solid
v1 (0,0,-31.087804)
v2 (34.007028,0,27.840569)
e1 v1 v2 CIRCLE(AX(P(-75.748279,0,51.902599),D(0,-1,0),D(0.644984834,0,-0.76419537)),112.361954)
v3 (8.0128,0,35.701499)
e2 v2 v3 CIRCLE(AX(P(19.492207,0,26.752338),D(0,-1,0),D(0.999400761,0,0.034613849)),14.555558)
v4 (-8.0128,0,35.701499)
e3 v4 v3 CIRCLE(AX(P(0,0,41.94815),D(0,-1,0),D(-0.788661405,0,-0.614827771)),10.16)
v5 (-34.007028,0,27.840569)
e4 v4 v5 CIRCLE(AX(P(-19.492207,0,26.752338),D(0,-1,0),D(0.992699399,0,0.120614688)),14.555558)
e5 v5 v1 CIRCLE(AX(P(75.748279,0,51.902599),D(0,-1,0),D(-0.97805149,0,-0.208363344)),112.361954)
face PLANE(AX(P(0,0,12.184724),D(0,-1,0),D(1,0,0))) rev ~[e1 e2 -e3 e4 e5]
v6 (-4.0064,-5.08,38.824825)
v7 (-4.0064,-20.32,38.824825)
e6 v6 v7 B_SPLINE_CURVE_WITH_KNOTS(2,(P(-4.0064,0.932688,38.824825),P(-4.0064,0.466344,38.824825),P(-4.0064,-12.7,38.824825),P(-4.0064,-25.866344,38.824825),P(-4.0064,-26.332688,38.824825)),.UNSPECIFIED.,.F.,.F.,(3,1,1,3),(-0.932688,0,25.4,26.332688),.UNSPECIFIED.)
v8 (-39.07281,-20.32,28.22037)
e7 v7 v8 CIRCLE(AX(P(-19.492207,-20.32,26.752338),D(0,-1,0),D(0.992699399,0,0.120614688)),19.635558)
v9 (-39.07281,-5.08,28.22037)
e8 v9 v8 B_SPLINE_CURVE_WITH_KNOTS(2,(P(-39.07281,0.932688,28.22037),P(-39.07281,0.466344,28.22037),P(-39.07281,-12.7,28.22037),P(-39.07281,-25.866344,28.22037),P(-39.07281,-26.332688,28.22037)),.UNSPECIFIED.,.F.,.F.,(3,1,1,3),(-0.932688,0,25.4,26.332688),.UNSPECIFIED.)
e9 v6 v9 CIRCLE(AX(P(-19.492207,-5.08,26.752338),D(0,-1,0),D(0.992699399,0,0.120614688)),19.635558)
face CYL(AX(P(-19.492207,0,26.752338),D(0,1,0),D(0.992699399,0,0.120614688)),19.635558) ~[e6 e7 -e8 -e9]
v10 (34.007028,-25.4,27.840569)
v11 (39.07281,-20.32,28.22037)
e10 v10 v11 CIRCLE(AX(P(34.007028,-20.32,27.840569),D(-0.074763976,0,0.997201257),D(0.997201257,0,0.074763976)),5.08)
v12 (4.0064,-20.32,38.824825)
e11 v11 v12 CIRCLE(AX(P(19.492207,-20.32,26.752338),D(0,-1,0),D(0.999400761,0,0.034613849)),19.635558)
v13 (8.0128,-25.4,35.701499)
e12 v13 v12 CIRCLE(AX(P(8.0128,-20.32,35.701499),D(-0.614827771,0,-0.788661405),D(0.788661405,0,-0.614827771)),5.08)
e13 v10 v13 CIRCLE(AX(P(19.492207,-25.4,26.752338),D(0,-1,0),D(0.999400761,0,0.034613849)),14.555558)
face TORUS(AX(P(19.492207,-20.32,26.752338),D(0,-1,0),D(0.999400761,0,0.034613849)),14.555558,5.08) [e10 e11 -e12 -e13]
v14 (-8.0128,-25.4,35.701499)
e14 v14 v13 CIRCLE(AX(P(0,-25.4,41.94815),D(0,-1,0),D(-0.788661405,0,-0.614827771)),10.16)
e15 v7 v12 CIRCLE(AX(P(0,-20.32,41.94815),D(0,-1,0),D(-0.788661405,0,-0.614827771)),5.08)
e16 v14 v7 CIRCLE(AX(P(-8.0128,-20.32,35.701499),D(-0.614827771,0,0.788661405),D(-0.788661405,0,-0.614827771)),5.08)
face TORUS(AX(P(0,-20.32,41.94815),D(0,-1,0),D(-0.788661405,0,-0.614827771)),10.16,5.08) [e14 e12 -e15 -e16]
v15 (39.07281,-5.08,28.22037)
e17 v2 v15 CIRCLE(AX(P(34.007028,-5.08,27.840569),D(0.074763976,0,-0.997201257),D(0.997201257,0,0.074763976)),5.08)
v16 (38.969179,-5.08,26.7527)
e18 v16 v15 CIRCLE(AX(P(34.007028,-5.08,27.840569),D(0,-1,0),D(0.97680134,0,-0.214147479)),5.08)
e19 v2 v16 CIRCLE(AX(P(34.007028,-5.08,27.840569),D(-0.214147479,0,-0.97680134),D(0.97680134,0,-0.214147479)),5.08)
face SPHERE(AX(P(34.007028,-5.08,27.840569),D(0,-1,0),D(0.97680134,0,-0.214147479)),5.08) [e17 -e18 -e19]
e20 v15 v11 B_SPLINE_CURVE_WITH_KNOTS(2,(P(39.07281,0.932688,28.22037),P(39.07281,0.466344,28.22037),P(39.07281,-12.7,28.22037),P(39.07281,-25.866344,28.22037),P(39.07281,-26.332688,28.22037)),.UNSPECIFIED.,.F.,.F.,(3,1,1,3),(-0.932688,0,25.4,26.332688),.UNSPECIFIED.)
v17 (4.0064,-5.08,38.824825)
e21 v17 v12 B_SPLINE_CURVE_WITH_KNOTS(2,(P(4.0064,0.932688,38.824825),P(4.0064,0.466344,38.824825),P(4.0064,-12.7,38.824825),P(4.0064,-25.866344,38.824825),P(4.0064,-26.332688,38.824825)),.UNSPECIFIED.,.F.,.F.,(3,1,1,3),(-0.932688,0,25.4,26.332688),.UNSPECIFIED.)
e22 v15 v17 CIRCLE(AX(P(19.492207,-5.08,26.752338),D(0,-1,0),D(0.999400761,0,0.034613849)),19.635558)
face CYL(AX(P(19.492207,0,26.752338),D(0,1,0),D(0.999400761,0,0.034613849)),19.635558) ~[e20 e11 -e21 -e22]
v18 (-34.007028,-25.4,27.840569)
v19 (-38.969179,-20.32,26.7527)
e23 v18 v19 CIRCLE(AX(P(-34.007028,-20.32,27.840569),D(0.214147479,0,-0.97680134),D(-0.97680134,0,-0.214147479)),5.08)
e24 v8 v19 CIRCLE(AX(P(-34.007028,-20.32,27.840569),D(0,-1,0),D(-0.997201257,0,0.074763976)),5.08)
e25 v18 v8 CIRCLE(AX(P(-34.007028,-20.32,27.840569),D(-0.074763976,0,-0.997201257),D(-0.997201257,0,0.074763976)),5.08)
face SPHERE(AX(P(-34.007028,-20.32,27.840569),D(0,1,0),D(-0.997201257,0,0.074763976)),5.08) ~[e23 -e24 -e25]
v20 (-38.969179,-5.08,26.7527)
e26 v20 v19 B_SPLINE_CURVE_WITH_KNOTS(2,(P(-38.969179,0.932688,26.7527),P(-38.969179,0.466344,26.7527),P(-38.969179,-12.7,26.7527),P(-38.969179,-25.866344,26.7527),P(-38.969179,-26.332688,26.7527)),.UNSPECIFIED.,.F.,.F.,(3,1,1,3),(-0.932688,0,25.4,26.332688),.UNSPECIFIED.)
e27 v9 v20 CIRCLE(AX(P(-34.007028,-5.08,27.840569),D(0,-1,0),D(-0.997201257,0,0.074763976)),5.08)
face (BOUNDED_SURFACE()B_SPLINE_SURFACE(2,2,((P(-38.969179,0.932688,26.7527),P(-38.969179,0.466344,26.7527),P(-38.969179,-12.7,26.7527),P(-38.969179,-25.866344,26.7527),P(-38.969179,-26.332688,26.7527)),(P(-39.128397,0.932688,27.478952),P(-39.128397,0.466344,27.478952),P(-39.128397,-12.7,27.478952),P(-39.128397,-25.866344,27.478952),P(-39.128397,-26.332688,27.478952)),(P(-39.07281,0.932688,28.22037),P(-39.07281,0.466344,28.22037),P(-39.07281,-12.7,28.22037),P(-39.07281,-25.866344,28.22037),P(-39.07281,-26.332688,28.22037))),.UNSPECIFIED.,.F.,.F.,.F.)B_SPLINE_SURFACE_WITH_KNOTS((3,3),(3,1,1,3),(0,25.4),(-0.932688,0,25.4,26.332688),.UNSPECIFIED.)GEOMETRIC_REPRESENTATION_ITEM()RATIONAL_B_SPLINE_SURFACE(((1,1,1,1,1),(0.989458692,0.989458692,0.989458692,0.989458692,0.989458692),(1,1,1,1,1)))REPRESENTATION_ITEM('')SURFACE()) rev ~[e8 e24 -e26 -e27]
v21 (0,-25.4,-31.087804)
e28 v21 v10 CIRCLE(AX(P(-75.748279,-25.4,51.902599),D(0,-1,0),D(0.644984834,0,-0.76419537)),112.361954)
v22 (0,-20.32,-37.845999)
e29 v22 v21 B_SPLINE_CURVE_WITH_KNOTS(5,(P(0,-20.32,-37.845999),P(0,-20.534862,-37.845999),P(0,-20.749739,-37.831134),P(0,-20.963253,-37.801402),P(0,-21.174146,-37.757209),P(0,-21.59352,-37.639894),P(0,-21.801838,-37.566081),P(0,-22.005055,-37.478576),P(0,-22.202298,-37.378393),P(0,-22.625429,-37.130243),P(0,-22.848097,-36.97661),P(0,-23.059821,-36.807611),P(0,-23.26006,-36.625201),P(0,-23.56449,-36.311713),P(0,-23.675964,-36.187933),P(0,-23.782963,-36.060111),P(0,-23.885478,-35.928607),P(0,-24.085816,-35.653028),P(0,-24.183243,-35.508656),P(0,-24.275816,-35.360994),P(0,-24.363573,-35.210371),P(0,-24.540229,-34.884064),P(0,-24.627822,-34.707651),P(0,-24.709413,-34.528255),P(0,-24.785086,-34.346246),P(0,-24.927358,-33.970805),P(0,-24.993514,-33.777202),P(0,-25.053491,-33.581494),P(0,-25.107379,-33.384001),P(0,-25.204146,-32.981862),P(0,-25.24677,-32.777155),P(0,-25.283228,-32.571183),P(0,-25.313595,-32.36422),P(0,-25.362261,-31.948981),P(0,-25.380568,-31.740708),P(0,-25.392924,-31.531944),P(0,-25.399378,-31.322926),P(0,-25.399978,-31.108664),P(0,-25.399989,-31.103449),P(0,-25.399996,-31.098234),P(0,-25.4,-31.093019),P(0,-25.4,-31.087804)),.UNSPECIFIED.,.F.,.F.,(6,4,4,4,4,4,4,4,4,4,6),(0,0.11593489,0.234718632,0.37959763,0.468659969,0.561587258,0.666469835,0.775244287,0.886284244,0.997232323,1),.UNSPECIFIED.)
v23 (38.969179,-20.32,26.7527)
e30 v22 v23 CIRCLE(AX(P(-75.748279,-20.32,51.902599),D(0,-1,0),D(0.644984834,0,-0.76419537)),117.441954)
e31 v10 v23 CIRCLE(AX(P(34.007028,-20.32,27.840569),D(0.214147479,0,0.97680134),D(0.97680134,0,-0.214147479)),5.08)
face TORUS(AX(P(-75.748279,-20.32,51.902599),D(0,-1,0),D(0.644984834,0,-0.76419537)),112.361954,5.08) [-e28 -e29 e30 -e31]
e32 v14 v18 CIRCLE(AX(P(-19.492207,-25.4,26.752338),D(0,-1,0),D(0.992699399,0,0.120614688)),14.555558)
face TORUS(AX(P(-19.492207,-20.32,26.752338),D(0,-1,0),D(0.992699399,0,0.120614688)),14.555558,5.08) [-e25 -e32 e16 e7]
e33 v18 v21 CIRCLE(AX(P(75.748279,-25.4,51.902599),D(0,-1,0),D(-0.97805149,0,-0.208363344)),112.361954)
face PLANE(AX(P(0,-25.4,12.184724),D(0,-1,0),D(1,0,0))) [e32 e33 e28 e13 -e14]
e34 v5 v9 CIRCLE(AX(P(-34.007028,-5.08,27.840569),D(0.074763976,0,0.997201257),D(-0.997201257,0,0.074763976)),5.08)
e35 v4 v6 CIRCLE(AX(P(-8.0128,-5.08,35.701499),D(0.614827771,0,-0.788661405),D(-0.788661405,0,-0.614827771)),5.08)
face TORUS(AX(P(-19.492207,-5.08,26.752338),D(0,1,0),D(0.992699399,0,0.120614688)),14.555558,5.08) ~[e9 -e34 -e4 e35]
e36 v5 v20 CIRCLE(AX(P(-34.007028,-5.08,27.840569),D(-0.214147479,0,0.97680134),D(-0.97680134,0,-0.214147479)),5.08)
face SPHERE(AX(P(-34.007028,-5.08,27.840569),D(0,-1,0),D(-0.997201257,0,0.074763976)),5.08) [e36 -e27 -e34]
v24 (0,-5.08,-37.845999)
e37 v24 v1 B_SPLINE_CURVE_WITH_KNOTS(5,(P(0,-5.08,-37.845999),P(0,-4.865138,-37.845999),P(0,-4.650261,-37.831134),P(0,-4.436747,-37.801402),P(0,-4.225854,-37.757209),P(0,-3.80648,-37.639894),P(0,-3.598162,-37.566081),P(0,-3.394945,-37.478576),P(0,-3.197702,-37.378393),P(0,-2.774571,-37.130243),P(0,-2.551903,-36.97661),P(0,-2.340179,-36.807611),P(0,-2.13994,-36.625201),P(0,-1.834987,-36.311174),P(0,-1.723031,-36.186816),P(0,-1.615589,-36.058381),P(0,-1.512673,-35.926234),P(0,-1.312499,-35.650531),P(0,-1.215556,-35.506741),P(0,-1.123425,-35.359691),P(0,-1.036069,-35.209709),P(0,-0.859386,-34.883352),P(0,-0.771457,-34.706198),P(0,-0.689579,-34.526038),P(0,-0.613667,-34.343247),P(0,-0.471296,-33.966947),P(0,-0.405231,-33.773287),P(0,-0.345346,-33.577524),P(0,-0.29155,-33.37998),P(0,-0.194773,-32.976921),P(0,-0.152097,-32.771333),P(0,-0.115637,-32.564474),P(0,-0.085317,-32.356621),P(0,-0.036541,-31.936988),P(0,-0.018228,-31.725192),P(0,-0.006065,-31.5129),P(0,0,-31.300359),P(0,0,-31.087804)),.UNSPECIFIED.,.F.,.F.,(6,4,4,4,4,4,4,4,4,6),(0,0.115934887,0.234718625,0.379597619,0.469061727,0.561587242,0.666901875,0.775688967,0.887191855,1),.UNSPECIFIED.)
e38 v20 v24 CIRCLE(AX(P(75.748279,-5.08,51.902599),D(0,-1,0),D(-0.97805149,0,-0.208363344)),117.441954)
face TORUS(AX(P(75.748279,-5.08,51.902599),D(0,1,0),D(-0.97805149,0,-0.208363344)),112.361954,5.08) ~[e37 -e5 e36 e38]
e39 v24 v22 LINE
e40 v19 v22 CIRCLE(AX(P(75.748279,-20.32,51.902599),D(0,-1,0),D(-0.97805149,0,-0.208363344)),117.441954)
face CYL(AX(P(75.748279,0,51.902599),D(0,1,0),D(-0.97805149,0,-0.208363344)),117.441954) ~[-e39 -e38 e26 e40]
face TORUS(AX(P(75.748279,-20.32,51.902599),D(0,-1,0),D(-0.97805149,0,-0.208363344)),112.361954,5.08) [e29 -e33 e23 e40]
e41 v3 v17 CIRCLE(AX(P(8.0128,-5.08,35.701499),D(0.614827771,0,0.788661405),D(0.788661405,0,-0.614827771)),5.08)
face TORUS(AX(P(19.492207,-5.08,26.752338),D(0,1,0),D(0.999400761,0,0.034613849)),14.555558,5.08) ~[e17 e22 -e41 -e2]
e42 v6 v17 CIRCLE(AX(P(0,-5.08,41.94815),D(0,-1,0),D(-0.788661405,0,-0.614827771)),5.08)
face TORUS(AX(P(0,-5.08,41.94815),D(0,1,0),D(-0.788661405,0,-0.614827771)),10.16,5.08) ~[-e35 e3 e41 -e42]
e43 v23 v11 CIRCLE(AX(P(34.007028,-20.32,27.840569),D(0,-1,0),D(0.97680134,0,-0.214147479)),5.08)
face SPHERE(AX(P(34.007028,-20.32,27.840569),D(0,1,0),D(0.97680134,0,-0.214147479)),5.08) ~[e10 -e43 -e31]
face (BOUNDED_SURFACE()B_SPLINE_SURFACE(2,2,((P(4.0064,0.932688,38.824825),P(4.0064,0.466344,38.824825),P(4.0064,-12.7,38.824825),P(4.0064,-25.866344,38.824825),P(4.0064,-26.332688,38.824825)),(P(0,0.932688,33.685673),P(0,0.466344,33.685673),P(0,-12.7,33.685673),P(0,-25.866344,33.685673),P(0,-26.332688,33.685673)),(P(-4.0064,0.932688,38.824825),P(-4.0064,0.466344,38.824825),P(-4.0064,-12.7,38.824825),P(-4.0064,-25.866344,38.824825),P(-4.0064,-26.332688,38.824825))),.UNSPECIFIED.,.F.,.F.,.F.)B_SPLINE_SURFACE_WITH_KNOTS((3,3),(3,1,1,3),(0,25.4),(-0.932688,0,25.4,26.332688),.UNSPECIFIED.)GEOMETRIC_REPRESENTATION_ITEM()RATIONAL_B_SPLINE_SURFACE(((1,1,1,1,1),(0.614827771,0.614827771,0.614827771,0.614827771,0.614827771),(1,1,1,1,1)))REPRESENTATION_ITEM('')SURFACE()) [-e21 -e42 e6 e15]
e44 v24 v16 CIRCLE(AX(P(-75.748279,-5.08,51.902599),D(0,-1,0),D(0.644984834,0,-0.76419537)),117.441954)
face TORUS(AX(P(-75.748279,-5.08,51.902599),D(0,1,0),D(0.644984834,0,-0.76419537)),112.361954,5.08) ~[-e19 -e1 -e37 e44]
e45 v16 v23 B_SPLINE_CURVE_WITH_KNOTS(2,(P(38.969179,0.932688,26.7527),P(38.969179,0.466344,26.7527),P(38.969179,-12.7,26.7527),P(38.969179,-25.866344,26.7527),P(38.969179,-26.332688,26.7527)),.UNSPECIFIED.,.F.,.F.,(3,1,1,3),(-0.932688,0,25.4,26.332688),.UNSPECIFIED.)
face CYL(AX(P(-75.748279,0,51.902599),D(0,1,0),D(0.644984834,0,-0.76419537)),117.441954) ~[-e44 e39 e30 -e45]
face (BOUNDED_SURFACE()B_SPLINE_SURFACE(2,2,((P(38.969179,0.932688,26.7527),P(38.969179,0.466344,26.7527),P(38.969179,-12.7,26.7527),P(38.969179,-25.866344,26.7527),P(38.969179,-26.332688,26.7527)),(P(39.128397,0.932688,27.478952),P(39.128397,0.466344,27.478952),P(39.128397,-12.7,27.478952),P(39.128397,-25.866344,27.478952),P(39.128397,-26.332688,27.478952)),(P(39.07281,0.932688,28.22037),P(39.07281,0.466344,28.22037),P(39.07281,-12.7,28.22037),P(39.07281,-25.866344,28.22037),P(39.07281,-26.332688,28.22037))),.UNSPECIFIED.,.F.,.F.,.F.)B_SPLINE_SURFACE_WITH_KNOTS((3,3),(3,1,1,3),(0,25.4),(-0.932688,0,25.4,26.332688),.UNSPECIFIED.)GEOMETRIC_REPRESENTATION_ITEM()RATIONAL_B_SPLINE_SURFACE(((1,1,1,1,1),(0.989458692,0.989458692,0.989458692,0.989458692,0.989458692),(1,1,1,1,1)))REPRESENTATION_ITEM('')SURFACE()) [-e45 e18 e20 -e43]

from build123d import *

# Parameters (mm, degrees)
F1_DEPTH = 25.4
F3_R     = 5.08


# Not quite as in the source:
# - a feature of the source that left no trace in its solid (it failed there, or was rolled back) is left out


with BuildPart() as f1:
    # F0 (on Front) → F1 (new body)
    with BuildSketch(Plane.XZ):
        with BuildLine():
            ThreePointArc((39.115998894, 27.4320002645), (20.3391036575, 46.3696241803), (0, 29.1206747426))
            ThreePointArc((0, 29.1206747426), (-20.3391036575, 46.3696241803), (-39.115998894, 27.4320002645))
            ThreePointArc((-39.115998894, 27.4320002645), (-24.9919364346, -8.4631327613), (0, -37.8459990025))
            ThreePointArc((0, -37.8459990025), (24.9919364346, -8.4631327613), (39.115998894, 27.4320002645))
        make_face()
        with BuildLine():
            ThreePointArc((0, 29.1206747426), (0.1433513735, 26.7523380063), (0, 24.3840012699))
            ThreePointArc((0, 24.3840012699), (-0.1433513735, 26.7523380063), (0, 29.1206747426))
        make_face(mode=Mode.SUBTRACT)
        with BuildLine():
            ThreePointArc((0, 29.1206747426), (-0.1433513735, 26.7523380063), (0, 24.3840012699))
            ThreePointArc((0, 24.3840012699), (0.1433513735, 26.7523380063), (0, 29.1206747426))
        make_face()
    extrude(amount=F1_DEPTH)

    # F3
    f3_edges = [f1.edges().sort_by_distance(p)[0] for p in [
        (20.339104, 0, 46.369624),
        (20.339104, -25.4, 46.369624),
        (0, -12.7, 29.120675),
        (-39.115999, -12.7, 27.432),
        (-20.339104, 0, 46.369624),
        (-20.339104, -25.4, 46.369624),
        (39.115999, -12.7, 27.432),
        (-24.991936, 0, -8.463133),
        (-24.991936, -25.4, -8.463133),
        (24.991936, 0, -8.463133),
        (24.991936, -25.4, -8.463133),
    ]]
    fillet(f3_edges, radius=F3_R)


solid = f1.part
